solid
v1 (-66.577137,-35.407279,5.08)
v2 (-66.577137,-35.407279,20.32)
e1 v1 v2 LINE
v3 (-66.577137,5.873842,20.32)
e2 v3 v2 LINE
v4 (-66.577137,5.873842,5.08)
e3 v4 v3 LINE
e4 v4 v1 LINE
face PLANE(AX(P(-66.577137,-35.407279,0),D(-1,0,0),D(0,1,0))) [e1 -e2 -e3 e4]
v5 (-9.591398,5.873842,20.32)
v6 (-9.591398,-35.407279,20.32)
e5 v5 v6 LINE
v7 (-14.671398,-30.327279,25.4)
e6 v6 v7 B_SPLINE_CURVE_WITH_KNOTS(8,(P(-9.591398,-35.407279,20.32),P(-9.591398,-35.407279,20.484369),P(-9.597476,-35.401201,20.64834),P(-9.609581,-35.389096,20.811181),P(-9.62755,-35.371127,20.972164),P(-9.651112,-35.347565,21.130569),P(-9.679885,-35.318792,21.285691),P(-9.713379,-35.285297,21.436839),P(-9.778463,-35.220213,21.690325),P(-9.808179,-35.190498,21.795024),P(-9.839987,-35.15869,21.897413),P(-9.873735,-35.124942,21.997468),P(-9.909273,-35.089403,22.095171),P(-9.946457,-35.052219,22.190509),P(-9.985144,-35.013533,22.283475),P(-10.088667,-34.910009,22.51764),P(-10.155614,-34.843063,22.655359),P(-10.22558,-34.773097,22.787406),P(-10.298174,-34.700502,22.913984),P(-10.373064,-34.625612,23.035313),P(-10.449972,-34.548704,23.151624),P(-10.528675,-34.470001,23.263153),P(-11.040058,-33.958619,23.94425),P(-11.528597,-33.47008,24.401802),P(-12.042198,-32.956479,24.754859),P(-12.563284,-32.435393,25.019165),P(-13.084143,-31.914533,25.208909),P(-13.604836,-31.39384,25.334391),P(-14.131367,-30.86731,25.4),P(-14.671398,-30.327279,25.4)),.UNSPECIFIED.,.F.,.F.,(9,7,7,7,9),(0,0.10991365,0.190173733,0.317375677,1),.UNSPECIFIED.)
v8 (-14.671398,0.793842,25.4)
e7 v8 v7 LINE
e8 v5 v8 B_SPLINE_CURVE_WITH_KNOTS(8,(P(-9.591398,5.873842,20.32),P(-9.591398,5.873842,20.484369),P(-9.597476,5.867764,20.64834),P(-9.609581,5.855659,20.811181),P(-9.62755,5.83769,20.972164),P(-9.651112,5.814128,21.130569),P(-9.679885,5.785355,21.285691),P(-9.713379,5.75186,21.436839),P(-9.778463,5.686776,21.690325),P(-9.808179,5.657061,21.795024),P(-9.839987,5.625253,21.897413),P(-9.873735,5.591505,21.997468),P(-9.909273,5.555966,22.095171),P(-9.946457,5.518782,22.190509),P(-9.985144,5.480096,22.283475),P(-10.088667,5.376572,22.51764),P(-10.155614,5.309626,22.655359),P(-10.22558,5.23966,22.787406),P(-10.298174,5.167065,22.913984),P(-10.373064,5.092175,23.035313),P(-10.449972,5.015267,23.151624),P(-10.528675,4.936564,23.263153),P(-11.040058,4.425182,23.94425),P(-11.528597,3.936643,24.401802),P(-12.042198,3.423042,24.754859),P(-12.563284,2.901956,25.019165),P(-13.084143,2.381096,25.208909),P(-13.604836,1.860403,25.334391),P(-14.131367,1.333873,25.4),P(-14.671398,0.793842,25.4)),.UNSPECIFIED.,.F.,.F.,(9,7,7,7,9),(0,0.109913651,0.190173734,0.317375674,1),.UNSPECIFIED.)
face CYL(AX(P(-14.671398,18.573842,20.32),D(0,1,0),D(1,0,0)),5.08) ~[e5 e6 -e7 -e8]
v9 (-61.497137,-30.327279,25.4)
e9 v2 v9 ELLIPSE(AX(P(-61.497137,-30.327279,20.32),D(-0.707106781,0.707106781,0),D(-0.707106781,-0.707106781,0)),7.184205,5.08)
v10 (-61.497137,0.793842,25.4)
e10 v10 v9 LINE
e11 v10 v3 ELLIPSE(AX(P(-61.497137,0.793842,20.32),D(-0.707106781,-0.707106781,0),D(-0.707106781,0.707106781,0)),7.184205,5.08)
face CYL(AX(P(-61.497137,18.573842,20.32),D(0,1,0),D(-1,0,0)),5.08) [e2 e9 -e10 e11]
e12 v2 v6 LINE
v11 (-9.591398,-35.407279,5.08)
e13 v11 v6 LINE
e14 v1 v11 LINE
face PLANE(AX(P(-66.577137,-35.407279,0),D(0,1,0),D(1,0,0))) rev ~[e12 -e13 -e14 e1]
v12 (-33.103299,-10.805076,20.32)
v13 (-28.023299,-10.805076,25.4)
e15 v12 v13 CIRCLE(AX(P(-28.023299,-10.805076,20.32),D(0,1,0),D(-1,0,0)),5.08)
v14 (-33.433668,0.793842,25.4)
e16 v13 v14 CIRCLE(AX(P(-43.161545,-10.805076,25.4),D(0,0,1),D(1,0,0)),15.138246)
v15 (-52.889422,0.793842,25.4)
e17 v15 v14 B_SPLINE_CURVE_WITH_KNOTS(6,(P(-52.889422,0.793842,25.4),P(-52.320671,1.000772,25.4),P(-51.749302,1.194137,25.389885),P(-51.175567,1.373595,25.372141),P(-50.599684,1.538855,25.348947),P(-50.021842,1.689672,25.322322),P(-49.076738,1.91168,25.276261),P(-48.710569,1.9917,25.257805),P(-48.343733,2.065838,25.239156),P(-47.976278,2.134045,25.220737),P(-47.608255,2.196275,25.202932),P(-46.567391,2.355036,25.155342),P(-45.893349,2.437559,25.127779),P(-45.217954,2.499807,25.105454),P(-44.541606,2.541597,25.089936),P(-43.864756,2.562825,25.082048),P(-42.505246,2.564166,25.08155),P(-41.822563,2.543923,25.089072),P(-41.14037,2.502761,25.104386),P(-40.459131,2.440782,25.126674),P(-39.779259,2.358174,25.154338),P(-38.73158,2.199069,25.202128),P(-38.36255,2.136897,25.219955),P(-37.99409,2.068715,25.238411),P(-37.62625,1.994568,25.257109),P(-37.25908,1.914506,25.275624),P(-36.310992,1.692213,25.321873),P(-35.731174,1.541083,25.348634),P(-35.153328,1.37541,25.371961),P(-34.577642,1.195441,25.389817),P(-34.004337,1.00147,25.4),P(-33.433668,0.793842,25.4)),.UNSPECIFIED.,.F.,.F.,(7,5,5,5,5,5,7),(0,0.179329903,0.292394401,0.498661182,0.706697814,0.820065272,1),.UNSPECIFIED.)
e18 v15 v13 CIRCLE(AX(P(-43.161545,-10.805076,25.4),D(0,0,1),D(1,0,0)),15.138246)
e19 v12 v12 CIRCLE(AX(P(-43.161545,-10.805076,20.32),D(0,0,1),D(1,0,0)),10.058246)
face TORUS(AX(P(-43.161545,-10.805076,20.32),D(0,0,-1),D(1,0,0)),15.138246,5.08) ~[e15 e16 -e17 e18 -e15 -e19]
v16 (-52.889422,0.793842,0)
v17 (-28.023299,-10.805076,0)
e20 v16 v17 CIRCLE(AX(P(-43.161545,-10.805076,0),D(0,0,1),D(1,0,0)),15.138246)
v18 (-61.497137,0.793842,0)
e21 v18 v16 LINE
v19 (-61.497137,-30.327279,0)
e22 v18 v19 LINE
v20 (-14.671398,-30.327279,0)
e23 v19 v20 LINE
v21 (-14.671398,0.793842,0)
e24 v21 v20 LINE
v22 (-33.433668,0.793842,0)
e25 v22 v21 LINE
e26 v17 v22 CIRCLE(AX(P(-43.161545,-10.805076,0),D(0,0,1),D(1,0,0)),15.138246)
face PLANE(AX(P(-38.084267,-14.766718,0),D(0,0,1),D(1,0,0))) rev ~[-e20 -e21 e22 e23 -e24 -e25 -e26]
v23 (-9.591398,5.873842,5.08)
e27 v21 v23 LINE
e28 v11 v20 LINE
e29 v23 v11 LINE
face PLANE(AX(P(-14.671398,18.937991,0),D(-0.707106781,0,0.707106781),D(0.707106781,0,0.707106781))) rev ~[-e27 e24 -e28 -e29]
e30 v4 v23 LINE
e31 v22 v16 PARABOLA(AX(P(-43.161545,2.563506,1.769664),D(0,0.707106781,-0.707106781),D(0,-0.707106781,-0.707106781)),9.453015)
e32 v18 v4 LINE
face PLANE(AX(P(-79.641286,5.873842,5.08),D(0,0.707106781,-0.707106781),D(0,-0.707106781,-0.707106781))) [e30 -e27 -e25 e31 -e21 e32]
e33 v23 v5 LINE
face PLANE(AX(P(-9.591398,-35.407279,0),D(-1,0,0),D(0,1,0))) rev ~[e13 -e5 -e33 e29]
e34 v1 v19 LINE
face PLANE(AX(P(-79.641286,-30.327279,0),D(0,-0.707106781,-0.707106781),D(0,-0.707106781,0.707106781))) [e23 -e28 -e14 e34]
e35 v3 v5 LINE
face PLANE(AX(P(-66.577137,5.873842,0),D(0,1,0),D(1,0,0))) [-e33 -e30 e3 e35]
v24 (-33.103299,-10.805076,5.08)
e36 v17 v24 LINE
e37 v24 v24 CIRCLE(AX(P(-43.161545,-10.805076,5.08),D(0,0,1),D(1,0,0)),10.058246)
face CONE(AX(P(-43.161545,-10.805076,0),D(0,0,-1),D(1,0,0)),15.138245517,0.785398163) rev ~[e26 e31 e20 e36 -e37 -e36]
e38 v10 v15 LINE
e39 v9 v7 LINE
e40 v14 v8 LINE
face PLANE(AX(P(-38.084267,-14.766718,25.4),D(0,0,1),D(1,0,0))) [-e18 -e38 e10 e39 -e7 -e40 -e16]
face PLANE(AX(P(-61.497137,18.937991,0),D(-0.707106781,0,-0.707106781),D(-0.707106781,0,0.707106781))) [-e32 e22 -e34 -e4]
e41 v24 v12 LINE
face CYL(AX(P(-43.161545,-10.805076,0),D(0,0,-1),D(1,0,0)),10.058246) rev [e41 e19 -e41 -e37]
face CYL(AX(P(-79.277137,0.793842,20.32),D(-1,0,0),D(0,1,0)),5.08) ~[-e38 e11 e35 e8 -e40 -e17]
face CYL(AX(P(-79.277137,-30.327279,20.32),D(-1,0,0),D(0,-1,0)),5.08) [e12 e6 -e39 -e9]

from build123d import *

# Parameters (mm, degrees)
F0_W        = 56.9857386872
F0_H        = 41.281120386
F0_R        = 10.0582455169
F1_DEPTH    = 25.4
F2_T1_DEPTH = 82.3857386872
F2_T3_DEPTH = 66.681120386
F3_T1_DEPTH = 83.114037845
F3_T3_DEPTH = 67.4094195437


# Not quite as in the source:
# - a fillet or chamfer that OpenCascade refuses, or shapes differently, is made with other operations: its cross-section is extruded or revolved along the edge and cut away or added


with BuildPart() as f1:
    # F0 (on Top) → F1 (new body)
    with BuildSketch(Plane.XY):
        with Locations((-38.084267173, -14.7667184938)):
            Rectangle(F0_W, F0_H)
        with Locations((-43.1615449488, -10.8050759882)):
            Circle(F0_R, mode=Mode.SUBTRACT)
    extrude(amount=F1_DEPTH)

    # F2: fillet of radius 5.08 on 5 edges, made by hand

    # F2_s2 → F2_t1 (cut)
    with BuildSketch(Plane.YZ.offset(-79.2771365166)):
        with BuildLine():
            ThreePointArc((5.8738416992, 20.32), (4.3859441476, 23.9121024484), (0.7938416992, 25.4))
            Line((0.7938416992, 25.4), (5.8738416992, 25.4))
            Line((5.8738416992, 25.4), (5.8738416992, 20.32))
        make_face()
        with BuildLine():
            ThreePointArc((-35.4072786868, 20.32), (-33.9193811352, 23.9121024484), (-30.3272786868, 25.4))
            Line((-30.3272786868, 25.4), (-35.4072786868, 25.4))
            Line((-35.4072786868, 25.4), (-35.4072786868, 20.32))
        make_face()
    extrude(amount=F2_T1_DEPTH, mode=Mode.SUBTRACT)

    # F2_s4 → F2_t3 (cut)
    with BuildSketch(Plane.XZ.offset(-18.5738416992)):
        with BuildLine():
            ThreePointArc((-66.5771365166, 20.32), (-65.089238965, 23.9121024484), (-61.4971365166, 25.4))
            Line((-61.4971365166, 25.4), (-66.5771365166, 25.4))
            Line((-66.5771365166, 25.4), (-66.5771365166, 20.32))
        make_face()
        with BuildLine():
            ThreePointArc((-9.5913978294, 20.32), (-11.0792953809, 23.9121024484), (-14.6713978294, 25.4))
            Line((-14.6713978294, 25.4), (-9.5913978294, 25.4))
            Line((-9.5913978294, 25.4), (-9.5913978294, 20.32))
        make_face()
    extrude(amount=F2_T3_DEPTH, mode=Mode.SUBTRACT)

    # F2_s5 → F2_t6 (revolve, cut)
    with BuildSketch(Plane.XZ.offset(10.8050759882)):
        with BuildLine():
            ThreePointArc((-33.103299432, 20.32), (-31.6154018804, 23.9121024484), (-28.023299432, 25.4))
            Line((-28.023299432, 25.4), (-33.103299432, 25.4))
            Line((-33.103299432, 25.4), (-33.103299432, 20.32))
        make_face()
    revolve(axis=Axis((-43.1615449488, -10.8050759882, 25.4), (0, 0, 1)), mode=Mode.SUBTRACT)

    # F3: chamfer of 5.08 on 5 edges, made by hand

    # F3_s2 → F3_t1 (cut)
    with BuildSketch(Plane.YZ.offset(-79.6412860954)):
        Polygon((5.8738416992, 5.08), (0.7938416992, 0), (5.8738416992, 0), align=None)
        Polygon((-30.3272786868, 0), (-35.4072786868, 5.08), (-35.4072786868, 0), align=None)
    extrude(amount=F3_T1_DEPTH, mode=Mode.SUBTRACT)

    # F3_s4 → F3_t3 (cut)
    with BuildSketch(Plane.XZ.offset(-18.9379912781)):
        Polygon((-61.4971365166, 0), (-66.5771365166, 5.08), (-66.5771365166, 0), align=None)
        Polygon((-14.6713978294, 0), (-9.5913978294, 5.08), (-9.5913978294, 0), align=None)
    extrude(amount=F3_T3_DEPTH, mode=Mode.SUBTRACT)

    # F3_s5 → F3_t6 (revolve, cut)
    with BuildSketch(Plane.XZ.offset(10.8050759882)):
        Polygon((-28.023299432, 0), (-33.103299432, 5.08), (-33.103299432, 0), align=None)
    revolve(axis=Axis((-43.1615449488, -10.8050759882, 0), (0, 0, 1)), mode=Mode.SUBTRACT)


solid = f1.part
